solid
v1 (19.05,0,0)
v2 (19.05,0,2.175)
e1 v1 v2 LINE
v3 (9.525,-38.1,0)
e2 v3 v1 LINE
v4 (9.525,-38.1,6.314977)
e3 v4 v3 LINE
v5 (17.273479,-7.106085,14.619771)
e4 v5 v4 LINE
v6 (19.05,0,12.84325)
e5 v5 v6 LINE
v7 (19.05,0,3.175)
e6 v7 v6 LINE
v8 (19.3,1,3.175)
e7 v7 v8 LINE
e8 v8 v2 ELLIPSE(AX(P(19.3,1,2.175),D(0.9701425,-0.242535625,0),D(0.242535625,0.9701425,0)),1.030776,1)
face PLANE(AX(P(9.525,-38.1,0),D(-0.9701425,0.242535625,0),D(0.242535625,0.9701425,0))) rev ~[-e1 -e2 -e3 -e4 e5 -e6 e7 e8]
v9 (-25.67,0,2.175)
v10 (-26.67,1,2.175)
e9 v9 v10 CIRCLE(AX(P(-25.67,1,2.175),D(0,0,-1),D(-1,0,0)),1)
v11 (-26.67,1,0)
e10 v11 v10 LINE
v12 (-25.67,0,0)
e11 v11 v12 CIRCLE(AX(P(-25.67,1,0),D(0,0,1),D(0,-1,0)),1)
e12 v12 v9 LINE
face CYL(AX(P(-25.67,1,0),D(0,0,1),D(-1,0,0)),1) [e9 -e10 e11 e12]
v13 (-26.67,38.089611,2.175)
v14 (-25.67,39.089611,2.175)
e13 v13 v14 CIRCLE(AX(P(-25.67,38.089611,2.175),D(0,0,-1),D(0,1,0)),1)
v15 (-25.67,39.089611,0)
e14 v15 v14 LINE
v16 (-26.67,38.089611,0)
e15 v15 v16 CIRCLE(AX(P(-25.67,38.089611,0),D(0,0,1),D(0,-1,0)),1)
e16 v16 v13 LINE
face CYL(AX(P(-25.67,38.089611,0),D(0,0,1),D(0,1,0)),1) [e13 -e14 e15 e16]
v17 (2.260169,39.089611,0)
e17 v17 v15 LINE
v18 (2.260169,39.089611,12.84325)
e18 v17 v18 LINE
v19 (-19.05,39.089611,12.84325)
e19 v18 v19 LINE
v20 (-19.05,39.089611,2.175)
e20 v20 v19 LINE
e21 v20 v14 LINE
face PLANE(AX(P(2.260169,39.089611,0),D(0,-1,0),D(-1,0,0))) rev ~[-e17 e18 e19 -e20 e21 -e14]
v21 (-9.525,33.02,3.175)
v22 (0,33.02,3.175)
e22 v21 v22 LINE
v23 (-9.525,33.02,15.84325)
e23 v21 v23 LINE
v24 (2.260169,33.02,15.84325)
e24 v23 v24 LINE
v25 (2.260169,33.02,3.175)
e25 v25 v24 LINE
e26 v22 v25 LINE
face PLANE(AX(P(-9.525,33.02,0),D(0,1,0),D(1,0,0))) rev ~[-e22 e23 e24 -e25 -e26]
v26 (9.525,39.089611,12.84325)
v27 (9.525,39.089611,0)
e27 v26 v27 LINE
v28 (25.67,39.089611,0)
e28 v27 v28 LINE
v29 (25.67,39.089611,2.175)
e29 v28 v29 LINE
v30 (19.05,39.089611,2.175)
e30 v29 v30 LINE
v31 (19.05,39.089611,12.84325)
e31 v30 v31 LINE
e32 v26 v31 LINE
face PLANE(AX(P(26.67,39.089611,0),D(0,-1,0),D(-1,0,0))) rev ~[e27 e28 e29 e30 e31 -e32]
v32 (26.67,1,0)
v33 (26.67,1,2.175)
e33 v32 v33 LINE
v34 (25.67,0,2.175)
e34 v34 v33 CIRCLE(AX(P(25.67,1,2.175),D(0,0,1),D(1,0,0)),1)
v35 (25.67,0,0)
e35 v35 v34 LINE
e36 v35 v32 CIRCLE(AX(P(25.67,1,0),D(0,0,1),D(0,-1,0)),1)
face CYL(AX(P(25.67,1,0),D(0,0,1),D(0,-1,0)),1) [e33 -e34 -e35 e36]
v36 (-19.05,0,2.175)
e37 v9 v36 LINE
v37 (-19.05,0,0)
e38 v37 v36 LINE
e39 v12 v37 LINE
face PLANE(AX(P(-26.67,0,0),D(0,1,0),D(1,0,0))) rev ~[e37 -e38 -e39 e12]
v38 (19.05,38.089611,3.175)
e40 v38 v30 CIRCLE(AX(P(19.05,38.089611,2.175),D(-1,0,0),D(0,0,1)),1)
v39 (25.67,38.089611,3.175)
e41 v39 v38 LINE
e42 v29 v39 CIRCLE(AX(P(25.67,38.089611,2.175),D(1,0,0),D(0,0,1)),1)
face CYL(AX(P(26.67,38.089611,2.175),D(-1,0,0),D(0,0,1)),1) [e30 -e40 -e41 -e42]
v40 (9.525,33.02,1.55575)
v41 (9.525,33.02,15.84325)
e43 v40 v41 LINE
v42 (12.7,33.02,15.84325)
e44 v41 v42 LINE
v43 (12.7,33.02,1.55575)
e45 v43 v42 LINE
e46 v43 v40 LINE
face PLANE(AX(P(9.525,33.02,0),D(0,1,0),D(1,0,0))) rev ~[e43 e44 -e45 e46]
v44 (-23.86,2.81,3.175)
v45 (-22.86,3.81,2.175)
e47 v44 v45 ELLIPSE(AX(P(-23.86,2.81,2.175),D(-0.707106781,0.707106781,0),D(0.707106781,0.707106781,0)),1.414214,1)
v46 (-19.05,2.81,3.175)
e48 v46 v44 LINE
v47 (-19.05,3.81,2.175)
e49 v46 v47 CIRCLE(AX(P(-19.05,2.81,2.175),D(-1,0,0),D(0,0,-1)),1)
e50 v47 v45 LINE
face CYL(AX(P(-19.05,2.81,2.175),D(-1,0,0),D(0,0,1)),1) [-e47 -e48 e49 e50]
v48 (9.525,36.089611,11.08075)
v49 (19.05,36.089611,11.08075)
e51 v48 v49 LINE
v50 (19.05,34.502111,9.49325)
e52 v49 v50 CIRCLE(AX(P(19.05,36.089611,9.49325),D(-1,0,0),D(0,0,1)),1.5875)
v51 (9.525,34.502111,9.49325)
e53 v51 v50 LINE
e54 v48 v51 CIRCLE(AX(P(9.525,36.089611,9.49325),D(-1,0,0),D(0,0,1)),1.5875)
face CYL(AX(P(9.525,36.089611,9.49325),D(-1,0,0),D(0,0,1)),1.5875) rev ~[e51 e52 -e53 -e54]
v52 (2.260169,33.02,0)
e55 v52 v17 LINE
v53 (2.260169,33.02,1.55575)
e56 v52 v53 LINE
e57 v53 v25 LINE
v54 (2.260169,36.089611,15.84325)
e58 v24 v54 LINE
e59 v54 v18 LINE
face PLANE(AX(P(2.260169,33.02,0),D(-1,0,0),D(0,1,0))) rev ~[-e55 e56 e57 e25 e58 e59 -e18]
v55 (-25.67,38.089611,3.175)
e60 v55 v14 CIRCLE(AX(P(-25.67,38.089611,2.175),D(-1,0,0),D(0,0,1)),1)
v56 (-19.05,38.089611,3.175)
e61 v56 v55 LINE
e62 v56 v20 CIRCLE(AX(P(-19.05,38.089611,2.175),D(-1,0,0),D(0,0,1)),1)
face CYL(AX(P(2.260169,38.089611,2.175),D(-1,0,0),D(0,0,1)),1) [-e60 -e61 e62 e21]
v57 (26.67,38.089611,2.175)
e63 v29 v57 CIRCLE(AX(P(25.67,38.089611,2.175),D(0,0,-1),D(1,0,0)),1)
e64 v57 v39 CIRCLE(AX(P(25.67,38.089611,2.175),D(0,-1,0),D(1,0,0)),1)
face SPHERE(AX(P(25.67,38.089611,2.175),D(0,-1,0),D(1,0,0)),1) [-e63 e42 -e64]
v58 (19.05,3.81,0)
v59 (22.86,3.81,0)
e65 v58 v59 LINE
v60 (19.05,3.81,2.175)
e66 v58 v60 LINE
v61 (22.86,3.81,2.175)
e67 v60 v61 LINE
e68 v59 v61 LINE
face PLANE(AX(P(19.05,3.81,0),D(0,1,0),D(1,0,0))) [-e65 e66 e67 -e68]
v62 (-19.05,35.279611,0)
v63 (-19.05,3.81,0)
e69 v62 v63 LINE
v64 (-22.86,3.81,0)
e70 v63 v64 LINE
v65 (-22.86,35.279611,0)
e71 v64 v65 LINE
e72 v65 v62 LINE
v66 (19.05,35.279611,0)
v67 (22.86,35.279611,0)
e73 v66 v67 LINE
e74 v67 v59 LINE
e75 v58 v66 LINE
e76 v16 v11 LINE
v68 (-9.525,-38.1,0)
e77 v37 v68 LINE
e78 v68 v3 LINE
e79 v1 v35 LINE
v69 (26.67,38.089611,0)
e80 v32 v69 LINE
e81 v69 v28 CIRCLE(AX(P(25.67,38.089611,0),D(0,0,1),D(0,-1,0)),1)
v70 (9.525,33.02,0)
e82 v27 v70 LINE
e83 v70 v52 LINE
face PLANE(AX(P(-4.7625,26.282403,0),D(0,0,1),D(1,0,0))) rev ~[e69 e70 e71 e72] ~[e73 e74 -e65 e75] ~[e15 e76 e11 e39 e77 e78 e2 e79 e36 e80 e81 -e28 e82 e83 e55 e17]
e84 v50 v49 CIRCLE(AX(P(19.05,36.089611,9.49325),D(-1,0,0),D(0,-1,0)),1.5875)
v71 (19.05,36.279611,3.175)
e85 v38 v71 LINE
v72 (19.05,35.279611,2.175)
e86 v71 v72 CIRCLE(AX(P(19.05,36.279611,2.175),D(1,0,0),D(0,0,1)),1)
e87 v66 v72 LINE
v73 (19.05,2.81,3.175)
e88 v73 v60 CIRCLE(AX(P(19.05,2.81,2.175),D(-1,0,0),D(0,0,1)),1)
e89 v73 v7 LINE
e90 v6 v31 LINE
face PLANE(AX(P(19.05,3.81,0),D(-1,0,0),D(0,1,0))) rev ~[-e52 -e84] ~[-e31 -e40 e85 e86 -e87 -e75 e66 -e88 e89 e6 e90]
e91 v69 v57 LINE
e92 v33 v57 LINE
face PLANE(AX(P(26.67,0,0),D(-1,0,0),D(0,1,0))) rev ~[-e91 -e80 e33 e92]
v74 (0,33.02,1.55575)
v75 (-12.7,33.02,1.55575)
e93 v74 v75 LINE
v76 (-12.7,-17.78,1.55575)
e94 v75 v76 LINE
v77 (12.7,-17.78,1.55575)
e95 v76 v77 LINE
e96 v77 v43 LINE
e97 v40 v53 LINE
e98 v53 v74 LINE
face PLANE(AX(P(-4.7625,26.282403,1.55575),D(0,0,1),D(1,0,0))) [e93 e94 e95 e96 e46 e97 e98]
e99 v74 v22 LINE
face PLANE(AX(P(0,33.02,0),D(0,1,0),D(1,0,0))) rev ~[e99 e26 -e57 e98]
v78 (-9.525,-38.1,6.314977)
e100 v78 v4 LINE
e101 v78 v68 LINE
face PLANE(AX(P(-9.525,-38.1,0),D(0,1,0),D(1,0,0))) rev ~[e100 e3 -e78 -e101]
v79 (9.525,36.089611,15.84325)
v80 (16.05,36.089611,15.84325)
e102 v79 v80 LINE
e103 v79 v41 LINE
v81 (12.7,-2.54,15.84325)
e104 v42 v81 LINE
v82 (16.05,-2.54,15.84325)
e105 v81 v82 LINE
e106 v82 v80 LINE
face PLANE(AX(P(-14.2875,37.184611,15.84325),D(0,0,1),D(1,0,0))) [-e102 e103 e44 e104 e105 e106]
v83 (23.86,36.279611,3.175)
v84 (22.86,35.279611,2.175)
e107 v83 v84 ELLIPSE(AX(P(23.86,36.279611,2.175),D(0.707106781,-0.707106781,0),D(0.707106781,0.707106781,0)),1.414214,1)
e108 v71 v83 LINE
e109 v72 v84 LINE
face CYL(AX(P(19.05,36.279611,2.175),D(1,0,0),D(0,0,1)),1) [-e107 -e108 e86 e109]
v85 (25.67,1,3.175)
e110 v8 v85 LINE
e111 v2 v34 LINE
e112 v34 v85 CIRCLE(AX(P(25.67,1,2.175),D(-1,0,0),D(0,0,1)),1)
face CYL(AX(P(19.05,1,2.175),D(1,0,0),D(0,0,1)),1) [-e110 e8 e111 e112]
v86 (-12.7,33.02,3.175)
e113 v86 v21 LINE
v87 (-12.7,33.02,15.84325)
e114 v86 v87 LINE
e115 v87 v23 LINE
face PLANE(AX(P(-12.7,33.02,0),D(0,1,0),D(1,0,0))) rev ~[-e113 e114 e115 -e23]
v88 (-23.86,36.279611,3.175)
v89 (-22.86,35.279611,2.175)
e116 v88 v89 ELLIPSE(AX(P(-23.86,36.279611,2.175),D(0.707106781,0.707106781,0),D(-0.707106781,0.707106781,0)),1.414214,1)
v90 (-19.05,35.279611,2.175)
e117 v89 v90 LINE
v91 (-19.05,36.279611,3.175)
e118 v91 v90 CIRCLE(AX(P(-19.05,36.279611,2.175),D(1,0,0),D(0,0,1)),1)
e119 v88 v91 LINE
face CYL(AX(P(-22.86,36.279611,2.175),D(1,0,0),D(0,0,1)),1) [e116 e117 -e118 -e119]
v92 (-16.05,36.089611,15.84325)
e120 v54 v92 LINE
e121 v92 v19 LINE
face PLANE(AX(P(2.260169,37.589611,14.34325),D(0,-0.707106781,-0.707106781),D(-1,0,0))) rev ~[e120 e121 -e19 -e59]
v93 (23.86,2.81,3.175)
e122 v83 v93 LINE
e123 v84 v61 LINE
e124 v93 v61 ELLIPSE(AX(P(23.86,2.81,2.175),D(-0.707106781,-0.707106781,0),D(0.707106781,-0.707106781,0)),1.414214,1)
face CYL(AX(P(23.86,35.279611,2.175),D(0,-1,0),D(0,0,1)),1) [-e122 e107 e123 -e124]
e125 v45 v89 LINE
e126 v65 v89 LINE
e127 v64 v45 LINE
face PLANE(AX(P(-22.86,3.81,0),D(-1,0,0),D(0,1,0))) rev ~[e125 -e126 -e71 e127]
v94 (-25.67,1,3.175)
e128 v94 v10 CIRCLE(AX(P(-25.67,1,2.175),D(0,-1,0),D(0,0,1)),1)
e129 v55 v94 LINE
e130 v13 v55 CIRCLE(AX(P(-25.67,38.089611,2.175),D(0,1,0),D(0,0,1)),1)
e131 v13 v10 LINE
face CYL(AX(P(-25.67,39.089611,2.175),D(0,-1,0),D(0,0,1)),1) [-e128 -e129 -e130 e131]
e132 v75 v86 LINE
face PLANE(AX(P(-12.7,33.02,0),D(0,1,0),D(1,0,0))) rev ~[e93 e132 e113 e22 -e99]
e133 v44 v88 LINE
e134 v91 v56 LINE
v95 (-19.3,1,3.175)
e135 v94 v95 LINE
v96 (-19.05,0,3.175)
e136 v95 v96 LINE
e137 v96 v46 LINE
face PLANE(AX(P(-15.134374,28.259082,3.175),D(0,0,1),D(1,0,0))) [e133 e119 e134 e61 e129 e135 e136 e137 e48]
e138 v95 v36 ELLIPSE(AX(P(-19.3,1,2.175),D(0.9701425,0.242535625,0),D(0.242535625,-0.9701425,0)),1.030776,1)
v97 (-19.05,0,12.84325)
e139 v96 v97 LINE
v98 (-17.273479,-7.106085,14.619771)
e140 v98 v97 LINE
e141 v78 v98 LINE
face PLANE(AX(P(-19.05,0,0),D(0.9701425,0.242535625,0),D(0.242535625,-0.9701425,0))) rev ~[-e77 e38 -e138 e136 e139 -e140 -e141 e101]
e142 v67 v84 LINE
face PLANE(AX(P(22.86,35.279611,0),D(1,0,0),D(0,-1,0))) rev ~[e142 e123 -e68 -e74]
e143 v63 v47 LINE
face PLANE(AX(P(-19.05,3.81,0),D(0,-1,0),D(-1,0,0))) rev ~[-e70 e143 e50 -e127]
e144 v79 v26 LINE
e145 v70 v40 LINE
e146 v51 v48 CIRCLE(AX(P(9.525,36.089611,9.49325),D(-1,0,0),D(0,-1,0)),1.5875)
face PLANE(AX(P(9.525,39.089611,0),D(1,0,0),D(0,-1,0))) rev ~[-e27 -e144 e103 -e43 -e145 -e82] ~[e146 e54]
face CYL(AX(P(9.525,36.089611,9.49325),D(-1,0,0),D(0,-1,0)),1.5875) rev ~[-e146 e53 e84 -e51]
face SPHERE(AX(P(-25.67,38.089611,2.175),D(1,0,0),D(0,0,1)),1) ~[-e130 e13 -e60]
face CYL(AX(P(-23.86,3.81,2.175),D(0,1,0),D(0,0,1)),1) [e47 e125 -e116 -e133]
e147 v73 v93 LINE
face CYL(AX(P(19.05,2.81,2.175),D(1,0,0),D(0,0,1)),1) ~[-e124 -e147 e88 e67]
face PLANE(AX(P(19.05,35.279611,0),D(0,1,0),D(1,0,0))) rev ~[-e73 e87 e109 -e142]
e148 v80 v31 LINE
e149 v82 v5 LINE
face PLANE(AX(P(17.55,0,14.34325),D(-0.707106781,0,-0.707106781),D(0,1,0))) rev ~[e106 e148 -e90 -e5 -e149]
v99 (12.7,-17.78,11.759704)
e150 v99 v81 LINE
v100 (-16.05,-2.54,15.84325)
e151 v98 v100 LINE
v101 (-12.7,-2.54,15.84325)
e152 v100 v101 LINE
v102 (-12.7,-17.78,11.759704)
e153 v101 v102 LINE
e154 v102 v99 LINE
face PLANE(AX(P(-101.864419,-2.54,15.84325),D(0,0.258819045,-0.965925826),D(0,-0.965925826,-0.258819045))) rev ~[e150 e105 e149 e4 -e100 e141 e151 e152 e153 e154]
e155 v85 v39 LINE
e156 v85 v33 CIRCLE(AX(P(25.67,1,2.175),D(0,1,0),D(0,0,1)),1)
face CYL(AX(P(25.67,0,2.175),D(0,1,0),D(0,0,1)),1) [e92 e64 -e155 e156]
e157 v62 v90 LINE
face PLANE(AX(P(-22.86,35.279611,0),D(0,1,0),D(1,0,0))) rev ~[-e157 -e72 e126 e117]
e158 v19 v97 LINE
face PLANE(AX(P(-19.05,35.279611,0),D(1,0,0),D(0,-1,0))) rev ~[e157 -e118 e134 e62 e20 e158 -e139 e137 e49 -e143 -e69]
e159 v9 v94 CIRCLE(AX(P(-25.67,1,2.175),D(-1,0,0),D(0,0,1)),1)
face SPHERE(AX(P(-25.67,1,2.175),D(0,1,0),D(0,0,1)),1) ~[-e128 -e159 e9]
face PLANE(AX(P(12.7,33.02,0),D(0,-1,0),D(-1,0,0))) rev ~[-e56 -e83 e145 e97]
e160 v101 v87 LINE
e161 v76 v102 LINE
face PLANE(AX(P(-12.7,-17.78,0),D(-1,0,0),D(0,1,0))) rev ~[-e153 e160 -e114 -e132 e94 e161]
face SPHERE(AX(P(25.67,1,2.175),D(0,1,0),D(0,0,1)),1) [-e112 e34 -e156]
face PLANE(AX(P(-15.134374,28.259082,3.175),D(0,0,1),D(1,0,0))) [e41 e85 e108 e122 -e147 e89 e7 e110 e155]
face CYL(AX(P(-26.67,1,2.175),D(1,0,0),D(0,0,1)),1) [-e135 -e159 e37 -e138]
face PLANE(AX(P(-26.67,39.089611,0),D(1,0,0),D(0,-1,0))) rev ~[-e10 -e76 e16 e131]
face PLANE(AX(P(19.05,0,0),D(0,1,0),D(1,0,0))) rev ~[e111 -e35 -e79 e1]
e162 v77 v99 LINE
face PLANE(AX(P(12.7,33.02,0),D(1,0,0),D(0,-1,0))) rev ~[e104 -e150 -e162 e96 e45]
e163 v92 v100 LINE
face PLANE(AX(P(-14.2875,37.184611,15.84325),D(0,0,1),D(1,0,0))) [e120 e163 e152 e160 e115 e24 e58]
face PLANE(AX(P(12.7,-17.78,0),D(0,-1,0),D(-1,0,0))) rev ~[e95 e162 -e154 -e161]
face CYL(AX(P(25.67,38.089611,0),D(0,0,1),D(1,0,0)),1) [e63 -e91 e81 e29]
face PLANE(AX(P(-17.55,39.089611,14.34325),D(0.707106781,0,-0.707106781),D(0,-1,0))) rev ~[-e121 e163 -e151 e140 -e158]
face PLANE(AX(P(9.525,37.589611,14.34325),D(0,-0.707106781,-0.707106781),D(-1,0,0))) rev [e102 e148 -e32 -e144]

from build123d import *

# Parameters (mm, degrees)
F0_W        = 9.525
F0_H        = 13.4751944874
F0_W_2      = 3.175
F0_H_2      = 15.7348055126
F0_H_3      = 17.78
F0_H_4      = 3.81
F1_DEPTH    = 1.55575
F0_W_3      = 3.81
F0_H_5      = 31.4696110251
F0_W_4      = 6.35
F0_H_6      = 1.27
F0_H_7      = 19.05
F0_H_8      = 2.2596110251
F0_W_5      = 2.2601685487
F2_DEPTH    = 3.175
F3_R        = 1
F4_DEPTH    = 15.84325
F5_SIZE     = 3
F6_T1_DEPTH = 203.7288380727
F8_DEPTH    = 25.4


# Not quite as in the source:
# - a fillet or chamfer that OpenCascade refuses, or shapes differently, is made with other operations: its cross-section is extruded or revolved along the edge and cut away or added


with BuildPart() as f1:
    # F0 (on Top) → F1 (new body)
    with BuildSketch(Plane.XY):
        with Locations((-4.7625, 26.2824027563)):
            Rectangle(F0_W, F0_H)
        with Locations((-11.1125, 26.2824027563)):
            Rectangle(F0_W_2, F0_H)
        with Locations((-11.1125, 11.6774027563)):
            Rectangle(F0_W_2, F0_H_2)
        with Locations((-4.7625, 11.6774027563)):
            Rectangle(F0_W, F0_H_2)
        with Locations((4.7625, 11.6774027563)):
            Rectangle(F0_W, F0_H_2)
        with Locations((11.1125, 11.6774027563)):
            Rectangle(F0_W_2, F0_H_2)
        with Locations((11.1125, 26.2824027563)):
            Rectangle(F0_W_2, F0_H)
        Polygon((0, 33.02), (0, 19.5448055126), (9.525, 19.5448055126), (9.525, 33.02), (2.2601685487, 33.02), align=None)
        with Locations((-4.7625, -8.89)):
            Rectangle(F0_W, F0_H_3)
        with Locations((4.7625, -8.89)):
            Rectangle(F0_W, F0_H_3)
        with Locations((11.1125, -8.89)):
            Rectangle(F0_W_2, F0_H_3)
        with Locations((-11.1125, -8.89)):
            Rectangle(F0_W_2, F0_H_3)
        with Locations((-11.1125, 1.905)):
            Rectangle(F0_W_2, F0_H_4)
        with Locations((-4.7625, 1.905)):
            Rectangle(F0_W, F0_H_4)
        with Locations((4.7625, 1.905)):
            Rectangle(F0_W, F0_H_4)
        with Locations((11.1125, 1.905)):
            Rectangle(F0_W_2, F0_H_4)
    extrude(amount=F1_DEPTH)

    # F0 (on Top) → F2 (join)
    with BuildSketch(Plane.XY):
        Polygon((-12.7, 33.02), (-9.525, 33.02), (-9.525, 35.2796110251), (-19.05, 35.2796110251), (-19.05, 19.5448055126), (-12.7, 19.5448055126), align=None)
        with Locations((-14.2875, 37.1846110251)):
            Rectangle(F0_W, F0_H_4)
        with Locations((-20.955, 37.1846110251)):
            Rectangle(F0_W_3, F0_H_4)
        with Locations((-24.765, 37.1846110251)):
            Rectangle(F0_W_3, F0_H_4)
        with Locations((-24.765, 19.5448055126)):
            Rectangle(F0_W_3, F0_H_5)
        with Locations((-24.765, 1.905)):
            Rectangle(F0_W_3, F0_H_4)
        with Locations((-20.955, 1.905)):
            Rectangle(F0_W_3, F0_H_4)
        with Locations((-15.875, 1.905)):
            Rectangle(F0_W_4, F0_H_4)
        with Locations((-15.875, 11.6774027563)):
            Rectangle(F0_W_4, F0_H_2)
        Polygon((-9.525, -19.05), (-9.525, -17.78), (-12.7, -17.78), (-12.7, 0), (-19.05, 0), (-14.2875, -19.05), align=None)
        with Locations((-4.7625, -18.415)):
            Rectangle(F0_W, F0_H_6)
        with Locations((4.7625, -18.415)):
            Rectangle(F0_W, F0_H_6)
        Polygon((12.7, -17.78), (9.525, -17.78), (9.525, -19.05), (14.2875, -19.05), (19.05, 0), (12.7, 0), align=None)
        Polygon((14.2875, -19.05), (9.525, -19.05), (9.525, -38.1), align=None)
        Polygon((-9.525, -38.1), (-9.525, -19.05), (-14.2875, -19.05), align=None)
        with Locations((-4.7625, -28.575)):
            Rectangle(F0_W, F0_H_7)
        with Locations((4.7625, -28.575)):
            Rectangle(F0_W, F0_H_7)
        with Locations((15.875, 1.905)):
            Rectangle(F0_W_4, F0_H_4)
        with Locations((15.875, 11.6774027563)):
            Rectangle(F0_W_4, F0_H_2)
        Polygon((9.525, 35.2796110251), (9.525, 33.02), (12.7, 33.02), (12.7, 19.5448055126), (19.05, 19.5448055126), (19.05, 35.2796110251), align=None)
        with Locations((-4.7625, 34.1498055126)):
            Rectangle(F0_W, F0_H_8)
        with Locations((-4.7625, 37.1846110251)):
            Rectangle(F0_W, F0_H_4)
        with Locations((1.1300842743, 37.1846110251)):
            Rectangle(F0_W_5, F0_H_4)
        with Locations((14.2875, 37.1846110251)):
            Rectangle(F0_W, F0_H_4)
        with Locations((20.955, 37.1846110251)):
            Rectangle(F0_W_3, F0_H_4)
        with Locations((24.765, 37.1846110251)):
            Rectangle(F0_W_3, F0_H_4)
        with Locations((24.765, 19.5448055126)):
            Rectangle(F0_W_3, F0_H_5)
        with Locations((24.765, 1.905)):
            Rectangle(F0_W_3, F0_H_4)
        with Locations((20.955, 1.905)):
            Rectangle(F0_W_3, F0_H_4)
        with Locations((1.1300842743, 34.1498055126)):
            Rectangle(F0_W_5, F0_H_8)
    extrude(amount=F2_DEPTH)

    # F3
    f3_edges = [f1.edges().sort_by_distance(p)[0] for p in [
        (26.67, 19.544806, 3.175),
        (22.86, 0, 3.175),
        (26.67, 0, 1.5875),
        (26.67, 39.089611, 1.5875),
        (-12.204916, 39.089611, 3.175),
        (18.0975, 39.089611, 3.175),
        (20.955, 35.279611, 3.175),
        (20.955, 3.81, 3.175),
        (22.86, 19.544806, 3.175),
        (-26.67, 19.544806, 3.175),
        (-22.86, 0, 3.175),
        (-26.67, 0, 1.5875),
        (-22.86, 19.544806, 3.175),
        (-20.955, 35.279611, 3.175),
        (-26.67, 39.089611, 1.5875),
        (-20.955, 3.81, 3.175),
    ]]
    fillet(f3_edges, radius=F3_R)

    # F0 (on Top) → F4 (join)
    with BuildSketch(Plane.XY):
        with Locations((-14.2875, 37.1846110251)):
            Rectangle(F0_W, F0_H_4)
        Polygon((-12.7, 33.02), (-9.525, 33.02), (-9.525, 35.2796110251), (-19.05, 35.2796110251), (-19.05, 19.5448055126), (-12.7, 19.5448055126), align=None)
        with Locations((-4.7625, 34.1498055126)):
            Rectangle(F0_W, F0_H_8)
        with Locations((-4.7625, 37.1846110251)):
            Rectangle(F0_W, F0_H_4)
        with Locations((1.1300842743, 37.1846110251)):
            Rectangle(F0_W_5, F0_H_4)
        with Locations((1.1300842743, 34.1498055126)):
            Rectangle(F0_W_5, F0_H_8)
        with Locations((14.2875, 37.1846110251)):
            Rectangle(F0_W, F0_H_4)
        Polygon((9.525, 35.2796110251), (9.525, 33.02), (12.7, 33.02), (12.7, 19.5448055126), (19.05, 19.5448055126), (19.05, 35.2796110251), align=None)
        with Locations((15.875, 11.6774027563)):
            Rectangle(F0_W_4, F0_H_2)
        with Locations((15.875, 1.905)):
            Rectangle(F0_W_4, F0_H_4)
        Polygon((12.7, -17.78), (9.525, -17.78), (9.525, -19.05), (14.2875, -19.05), (19.05, 0), (12.7, 0), align=None)
        with Locations((4.7625, -18.415)):
            Rectangle(F0_W, F0_H_6)
        with Locations((-4.7625, -18.415)):
            Rectangle(F0_W, F0_H_6)
        Polygon((-9.525, -19.05), (-9.525, -17.78), (-12.7, -17.78), (-12.7, 0), (-19.05, 0), (-14.2875, -19.05), align=None)
        with Locations((-15.875, 11.6774027563)):
            Rectangle(F0_W_4, F0_H_2)
        with Locations((-15.875, 1.905)):
            Rectangle(F0_W_4, F0_H_4)
        Polygon((-9.525, -38.1), (-9.525, -19.05), (-14.2875, -19.05), align=None)
        Polygon((14.2875, -19.05), (9.525, -19.05), (9.525, -38.1), align=None)
        with Locations((4.7625, -28.575)):
            Rectangle(F0_W, F0_H_7)
        with Locations((-4.7625, -28.575)):
            Rectangle(F0_W, F0_H_7)
    extrude(amount=F4_DEPTH)

    # F5
    f5_edges = [f1.edges().sort_by_distance(p)[0] for p in [
        (-19.05, 19.544806, 15.84325),
        (-8.394916, 39.089611, 15.84325),
        (14.2875, 39.089611, 15.84325),
        (19.05, 19.544806, 15.84325),
    ]]
    chamfer(f5_edges, length=F5_SIZE)

    # F6: chamfer of 35.56 x 9.5282732829 on 1 edges, made by hand

    # F6_s2 → F6_t1 (cut)
    with BuildSketch(Plane.YZ.offset(-101.8644190363)):
        Polygon((-2.54, 15.84325), (-38.1, 6.3149767171), (-38.1, 15.84325), align=None)
    extrude(amount=F6_T1_DEPTH, mode=Mode.SUBTRACT)

    # F7 (on face) → F8 (cut)
    with BuildSketch(Plane(origin=(9.525, 0, 0), x_dir=(0, -1, 0), z_dir=(-1, 0, 0))):
        with BuildLine():
            ThreePointArc((-34.5021110251, 9.49325), (-34.96707901, 10.6157820151), (-36.0896110251, 11.08075))
            ThreePointArc((-36.0896110251, 11.08075), (-37.2121430402, 8.3707179849), (-34.5021110251, 9.49325))
        make_face()
    extrude(amount=-F8_DEPTH, mode=Mode.SUBTRACT)


solid = f1.part
